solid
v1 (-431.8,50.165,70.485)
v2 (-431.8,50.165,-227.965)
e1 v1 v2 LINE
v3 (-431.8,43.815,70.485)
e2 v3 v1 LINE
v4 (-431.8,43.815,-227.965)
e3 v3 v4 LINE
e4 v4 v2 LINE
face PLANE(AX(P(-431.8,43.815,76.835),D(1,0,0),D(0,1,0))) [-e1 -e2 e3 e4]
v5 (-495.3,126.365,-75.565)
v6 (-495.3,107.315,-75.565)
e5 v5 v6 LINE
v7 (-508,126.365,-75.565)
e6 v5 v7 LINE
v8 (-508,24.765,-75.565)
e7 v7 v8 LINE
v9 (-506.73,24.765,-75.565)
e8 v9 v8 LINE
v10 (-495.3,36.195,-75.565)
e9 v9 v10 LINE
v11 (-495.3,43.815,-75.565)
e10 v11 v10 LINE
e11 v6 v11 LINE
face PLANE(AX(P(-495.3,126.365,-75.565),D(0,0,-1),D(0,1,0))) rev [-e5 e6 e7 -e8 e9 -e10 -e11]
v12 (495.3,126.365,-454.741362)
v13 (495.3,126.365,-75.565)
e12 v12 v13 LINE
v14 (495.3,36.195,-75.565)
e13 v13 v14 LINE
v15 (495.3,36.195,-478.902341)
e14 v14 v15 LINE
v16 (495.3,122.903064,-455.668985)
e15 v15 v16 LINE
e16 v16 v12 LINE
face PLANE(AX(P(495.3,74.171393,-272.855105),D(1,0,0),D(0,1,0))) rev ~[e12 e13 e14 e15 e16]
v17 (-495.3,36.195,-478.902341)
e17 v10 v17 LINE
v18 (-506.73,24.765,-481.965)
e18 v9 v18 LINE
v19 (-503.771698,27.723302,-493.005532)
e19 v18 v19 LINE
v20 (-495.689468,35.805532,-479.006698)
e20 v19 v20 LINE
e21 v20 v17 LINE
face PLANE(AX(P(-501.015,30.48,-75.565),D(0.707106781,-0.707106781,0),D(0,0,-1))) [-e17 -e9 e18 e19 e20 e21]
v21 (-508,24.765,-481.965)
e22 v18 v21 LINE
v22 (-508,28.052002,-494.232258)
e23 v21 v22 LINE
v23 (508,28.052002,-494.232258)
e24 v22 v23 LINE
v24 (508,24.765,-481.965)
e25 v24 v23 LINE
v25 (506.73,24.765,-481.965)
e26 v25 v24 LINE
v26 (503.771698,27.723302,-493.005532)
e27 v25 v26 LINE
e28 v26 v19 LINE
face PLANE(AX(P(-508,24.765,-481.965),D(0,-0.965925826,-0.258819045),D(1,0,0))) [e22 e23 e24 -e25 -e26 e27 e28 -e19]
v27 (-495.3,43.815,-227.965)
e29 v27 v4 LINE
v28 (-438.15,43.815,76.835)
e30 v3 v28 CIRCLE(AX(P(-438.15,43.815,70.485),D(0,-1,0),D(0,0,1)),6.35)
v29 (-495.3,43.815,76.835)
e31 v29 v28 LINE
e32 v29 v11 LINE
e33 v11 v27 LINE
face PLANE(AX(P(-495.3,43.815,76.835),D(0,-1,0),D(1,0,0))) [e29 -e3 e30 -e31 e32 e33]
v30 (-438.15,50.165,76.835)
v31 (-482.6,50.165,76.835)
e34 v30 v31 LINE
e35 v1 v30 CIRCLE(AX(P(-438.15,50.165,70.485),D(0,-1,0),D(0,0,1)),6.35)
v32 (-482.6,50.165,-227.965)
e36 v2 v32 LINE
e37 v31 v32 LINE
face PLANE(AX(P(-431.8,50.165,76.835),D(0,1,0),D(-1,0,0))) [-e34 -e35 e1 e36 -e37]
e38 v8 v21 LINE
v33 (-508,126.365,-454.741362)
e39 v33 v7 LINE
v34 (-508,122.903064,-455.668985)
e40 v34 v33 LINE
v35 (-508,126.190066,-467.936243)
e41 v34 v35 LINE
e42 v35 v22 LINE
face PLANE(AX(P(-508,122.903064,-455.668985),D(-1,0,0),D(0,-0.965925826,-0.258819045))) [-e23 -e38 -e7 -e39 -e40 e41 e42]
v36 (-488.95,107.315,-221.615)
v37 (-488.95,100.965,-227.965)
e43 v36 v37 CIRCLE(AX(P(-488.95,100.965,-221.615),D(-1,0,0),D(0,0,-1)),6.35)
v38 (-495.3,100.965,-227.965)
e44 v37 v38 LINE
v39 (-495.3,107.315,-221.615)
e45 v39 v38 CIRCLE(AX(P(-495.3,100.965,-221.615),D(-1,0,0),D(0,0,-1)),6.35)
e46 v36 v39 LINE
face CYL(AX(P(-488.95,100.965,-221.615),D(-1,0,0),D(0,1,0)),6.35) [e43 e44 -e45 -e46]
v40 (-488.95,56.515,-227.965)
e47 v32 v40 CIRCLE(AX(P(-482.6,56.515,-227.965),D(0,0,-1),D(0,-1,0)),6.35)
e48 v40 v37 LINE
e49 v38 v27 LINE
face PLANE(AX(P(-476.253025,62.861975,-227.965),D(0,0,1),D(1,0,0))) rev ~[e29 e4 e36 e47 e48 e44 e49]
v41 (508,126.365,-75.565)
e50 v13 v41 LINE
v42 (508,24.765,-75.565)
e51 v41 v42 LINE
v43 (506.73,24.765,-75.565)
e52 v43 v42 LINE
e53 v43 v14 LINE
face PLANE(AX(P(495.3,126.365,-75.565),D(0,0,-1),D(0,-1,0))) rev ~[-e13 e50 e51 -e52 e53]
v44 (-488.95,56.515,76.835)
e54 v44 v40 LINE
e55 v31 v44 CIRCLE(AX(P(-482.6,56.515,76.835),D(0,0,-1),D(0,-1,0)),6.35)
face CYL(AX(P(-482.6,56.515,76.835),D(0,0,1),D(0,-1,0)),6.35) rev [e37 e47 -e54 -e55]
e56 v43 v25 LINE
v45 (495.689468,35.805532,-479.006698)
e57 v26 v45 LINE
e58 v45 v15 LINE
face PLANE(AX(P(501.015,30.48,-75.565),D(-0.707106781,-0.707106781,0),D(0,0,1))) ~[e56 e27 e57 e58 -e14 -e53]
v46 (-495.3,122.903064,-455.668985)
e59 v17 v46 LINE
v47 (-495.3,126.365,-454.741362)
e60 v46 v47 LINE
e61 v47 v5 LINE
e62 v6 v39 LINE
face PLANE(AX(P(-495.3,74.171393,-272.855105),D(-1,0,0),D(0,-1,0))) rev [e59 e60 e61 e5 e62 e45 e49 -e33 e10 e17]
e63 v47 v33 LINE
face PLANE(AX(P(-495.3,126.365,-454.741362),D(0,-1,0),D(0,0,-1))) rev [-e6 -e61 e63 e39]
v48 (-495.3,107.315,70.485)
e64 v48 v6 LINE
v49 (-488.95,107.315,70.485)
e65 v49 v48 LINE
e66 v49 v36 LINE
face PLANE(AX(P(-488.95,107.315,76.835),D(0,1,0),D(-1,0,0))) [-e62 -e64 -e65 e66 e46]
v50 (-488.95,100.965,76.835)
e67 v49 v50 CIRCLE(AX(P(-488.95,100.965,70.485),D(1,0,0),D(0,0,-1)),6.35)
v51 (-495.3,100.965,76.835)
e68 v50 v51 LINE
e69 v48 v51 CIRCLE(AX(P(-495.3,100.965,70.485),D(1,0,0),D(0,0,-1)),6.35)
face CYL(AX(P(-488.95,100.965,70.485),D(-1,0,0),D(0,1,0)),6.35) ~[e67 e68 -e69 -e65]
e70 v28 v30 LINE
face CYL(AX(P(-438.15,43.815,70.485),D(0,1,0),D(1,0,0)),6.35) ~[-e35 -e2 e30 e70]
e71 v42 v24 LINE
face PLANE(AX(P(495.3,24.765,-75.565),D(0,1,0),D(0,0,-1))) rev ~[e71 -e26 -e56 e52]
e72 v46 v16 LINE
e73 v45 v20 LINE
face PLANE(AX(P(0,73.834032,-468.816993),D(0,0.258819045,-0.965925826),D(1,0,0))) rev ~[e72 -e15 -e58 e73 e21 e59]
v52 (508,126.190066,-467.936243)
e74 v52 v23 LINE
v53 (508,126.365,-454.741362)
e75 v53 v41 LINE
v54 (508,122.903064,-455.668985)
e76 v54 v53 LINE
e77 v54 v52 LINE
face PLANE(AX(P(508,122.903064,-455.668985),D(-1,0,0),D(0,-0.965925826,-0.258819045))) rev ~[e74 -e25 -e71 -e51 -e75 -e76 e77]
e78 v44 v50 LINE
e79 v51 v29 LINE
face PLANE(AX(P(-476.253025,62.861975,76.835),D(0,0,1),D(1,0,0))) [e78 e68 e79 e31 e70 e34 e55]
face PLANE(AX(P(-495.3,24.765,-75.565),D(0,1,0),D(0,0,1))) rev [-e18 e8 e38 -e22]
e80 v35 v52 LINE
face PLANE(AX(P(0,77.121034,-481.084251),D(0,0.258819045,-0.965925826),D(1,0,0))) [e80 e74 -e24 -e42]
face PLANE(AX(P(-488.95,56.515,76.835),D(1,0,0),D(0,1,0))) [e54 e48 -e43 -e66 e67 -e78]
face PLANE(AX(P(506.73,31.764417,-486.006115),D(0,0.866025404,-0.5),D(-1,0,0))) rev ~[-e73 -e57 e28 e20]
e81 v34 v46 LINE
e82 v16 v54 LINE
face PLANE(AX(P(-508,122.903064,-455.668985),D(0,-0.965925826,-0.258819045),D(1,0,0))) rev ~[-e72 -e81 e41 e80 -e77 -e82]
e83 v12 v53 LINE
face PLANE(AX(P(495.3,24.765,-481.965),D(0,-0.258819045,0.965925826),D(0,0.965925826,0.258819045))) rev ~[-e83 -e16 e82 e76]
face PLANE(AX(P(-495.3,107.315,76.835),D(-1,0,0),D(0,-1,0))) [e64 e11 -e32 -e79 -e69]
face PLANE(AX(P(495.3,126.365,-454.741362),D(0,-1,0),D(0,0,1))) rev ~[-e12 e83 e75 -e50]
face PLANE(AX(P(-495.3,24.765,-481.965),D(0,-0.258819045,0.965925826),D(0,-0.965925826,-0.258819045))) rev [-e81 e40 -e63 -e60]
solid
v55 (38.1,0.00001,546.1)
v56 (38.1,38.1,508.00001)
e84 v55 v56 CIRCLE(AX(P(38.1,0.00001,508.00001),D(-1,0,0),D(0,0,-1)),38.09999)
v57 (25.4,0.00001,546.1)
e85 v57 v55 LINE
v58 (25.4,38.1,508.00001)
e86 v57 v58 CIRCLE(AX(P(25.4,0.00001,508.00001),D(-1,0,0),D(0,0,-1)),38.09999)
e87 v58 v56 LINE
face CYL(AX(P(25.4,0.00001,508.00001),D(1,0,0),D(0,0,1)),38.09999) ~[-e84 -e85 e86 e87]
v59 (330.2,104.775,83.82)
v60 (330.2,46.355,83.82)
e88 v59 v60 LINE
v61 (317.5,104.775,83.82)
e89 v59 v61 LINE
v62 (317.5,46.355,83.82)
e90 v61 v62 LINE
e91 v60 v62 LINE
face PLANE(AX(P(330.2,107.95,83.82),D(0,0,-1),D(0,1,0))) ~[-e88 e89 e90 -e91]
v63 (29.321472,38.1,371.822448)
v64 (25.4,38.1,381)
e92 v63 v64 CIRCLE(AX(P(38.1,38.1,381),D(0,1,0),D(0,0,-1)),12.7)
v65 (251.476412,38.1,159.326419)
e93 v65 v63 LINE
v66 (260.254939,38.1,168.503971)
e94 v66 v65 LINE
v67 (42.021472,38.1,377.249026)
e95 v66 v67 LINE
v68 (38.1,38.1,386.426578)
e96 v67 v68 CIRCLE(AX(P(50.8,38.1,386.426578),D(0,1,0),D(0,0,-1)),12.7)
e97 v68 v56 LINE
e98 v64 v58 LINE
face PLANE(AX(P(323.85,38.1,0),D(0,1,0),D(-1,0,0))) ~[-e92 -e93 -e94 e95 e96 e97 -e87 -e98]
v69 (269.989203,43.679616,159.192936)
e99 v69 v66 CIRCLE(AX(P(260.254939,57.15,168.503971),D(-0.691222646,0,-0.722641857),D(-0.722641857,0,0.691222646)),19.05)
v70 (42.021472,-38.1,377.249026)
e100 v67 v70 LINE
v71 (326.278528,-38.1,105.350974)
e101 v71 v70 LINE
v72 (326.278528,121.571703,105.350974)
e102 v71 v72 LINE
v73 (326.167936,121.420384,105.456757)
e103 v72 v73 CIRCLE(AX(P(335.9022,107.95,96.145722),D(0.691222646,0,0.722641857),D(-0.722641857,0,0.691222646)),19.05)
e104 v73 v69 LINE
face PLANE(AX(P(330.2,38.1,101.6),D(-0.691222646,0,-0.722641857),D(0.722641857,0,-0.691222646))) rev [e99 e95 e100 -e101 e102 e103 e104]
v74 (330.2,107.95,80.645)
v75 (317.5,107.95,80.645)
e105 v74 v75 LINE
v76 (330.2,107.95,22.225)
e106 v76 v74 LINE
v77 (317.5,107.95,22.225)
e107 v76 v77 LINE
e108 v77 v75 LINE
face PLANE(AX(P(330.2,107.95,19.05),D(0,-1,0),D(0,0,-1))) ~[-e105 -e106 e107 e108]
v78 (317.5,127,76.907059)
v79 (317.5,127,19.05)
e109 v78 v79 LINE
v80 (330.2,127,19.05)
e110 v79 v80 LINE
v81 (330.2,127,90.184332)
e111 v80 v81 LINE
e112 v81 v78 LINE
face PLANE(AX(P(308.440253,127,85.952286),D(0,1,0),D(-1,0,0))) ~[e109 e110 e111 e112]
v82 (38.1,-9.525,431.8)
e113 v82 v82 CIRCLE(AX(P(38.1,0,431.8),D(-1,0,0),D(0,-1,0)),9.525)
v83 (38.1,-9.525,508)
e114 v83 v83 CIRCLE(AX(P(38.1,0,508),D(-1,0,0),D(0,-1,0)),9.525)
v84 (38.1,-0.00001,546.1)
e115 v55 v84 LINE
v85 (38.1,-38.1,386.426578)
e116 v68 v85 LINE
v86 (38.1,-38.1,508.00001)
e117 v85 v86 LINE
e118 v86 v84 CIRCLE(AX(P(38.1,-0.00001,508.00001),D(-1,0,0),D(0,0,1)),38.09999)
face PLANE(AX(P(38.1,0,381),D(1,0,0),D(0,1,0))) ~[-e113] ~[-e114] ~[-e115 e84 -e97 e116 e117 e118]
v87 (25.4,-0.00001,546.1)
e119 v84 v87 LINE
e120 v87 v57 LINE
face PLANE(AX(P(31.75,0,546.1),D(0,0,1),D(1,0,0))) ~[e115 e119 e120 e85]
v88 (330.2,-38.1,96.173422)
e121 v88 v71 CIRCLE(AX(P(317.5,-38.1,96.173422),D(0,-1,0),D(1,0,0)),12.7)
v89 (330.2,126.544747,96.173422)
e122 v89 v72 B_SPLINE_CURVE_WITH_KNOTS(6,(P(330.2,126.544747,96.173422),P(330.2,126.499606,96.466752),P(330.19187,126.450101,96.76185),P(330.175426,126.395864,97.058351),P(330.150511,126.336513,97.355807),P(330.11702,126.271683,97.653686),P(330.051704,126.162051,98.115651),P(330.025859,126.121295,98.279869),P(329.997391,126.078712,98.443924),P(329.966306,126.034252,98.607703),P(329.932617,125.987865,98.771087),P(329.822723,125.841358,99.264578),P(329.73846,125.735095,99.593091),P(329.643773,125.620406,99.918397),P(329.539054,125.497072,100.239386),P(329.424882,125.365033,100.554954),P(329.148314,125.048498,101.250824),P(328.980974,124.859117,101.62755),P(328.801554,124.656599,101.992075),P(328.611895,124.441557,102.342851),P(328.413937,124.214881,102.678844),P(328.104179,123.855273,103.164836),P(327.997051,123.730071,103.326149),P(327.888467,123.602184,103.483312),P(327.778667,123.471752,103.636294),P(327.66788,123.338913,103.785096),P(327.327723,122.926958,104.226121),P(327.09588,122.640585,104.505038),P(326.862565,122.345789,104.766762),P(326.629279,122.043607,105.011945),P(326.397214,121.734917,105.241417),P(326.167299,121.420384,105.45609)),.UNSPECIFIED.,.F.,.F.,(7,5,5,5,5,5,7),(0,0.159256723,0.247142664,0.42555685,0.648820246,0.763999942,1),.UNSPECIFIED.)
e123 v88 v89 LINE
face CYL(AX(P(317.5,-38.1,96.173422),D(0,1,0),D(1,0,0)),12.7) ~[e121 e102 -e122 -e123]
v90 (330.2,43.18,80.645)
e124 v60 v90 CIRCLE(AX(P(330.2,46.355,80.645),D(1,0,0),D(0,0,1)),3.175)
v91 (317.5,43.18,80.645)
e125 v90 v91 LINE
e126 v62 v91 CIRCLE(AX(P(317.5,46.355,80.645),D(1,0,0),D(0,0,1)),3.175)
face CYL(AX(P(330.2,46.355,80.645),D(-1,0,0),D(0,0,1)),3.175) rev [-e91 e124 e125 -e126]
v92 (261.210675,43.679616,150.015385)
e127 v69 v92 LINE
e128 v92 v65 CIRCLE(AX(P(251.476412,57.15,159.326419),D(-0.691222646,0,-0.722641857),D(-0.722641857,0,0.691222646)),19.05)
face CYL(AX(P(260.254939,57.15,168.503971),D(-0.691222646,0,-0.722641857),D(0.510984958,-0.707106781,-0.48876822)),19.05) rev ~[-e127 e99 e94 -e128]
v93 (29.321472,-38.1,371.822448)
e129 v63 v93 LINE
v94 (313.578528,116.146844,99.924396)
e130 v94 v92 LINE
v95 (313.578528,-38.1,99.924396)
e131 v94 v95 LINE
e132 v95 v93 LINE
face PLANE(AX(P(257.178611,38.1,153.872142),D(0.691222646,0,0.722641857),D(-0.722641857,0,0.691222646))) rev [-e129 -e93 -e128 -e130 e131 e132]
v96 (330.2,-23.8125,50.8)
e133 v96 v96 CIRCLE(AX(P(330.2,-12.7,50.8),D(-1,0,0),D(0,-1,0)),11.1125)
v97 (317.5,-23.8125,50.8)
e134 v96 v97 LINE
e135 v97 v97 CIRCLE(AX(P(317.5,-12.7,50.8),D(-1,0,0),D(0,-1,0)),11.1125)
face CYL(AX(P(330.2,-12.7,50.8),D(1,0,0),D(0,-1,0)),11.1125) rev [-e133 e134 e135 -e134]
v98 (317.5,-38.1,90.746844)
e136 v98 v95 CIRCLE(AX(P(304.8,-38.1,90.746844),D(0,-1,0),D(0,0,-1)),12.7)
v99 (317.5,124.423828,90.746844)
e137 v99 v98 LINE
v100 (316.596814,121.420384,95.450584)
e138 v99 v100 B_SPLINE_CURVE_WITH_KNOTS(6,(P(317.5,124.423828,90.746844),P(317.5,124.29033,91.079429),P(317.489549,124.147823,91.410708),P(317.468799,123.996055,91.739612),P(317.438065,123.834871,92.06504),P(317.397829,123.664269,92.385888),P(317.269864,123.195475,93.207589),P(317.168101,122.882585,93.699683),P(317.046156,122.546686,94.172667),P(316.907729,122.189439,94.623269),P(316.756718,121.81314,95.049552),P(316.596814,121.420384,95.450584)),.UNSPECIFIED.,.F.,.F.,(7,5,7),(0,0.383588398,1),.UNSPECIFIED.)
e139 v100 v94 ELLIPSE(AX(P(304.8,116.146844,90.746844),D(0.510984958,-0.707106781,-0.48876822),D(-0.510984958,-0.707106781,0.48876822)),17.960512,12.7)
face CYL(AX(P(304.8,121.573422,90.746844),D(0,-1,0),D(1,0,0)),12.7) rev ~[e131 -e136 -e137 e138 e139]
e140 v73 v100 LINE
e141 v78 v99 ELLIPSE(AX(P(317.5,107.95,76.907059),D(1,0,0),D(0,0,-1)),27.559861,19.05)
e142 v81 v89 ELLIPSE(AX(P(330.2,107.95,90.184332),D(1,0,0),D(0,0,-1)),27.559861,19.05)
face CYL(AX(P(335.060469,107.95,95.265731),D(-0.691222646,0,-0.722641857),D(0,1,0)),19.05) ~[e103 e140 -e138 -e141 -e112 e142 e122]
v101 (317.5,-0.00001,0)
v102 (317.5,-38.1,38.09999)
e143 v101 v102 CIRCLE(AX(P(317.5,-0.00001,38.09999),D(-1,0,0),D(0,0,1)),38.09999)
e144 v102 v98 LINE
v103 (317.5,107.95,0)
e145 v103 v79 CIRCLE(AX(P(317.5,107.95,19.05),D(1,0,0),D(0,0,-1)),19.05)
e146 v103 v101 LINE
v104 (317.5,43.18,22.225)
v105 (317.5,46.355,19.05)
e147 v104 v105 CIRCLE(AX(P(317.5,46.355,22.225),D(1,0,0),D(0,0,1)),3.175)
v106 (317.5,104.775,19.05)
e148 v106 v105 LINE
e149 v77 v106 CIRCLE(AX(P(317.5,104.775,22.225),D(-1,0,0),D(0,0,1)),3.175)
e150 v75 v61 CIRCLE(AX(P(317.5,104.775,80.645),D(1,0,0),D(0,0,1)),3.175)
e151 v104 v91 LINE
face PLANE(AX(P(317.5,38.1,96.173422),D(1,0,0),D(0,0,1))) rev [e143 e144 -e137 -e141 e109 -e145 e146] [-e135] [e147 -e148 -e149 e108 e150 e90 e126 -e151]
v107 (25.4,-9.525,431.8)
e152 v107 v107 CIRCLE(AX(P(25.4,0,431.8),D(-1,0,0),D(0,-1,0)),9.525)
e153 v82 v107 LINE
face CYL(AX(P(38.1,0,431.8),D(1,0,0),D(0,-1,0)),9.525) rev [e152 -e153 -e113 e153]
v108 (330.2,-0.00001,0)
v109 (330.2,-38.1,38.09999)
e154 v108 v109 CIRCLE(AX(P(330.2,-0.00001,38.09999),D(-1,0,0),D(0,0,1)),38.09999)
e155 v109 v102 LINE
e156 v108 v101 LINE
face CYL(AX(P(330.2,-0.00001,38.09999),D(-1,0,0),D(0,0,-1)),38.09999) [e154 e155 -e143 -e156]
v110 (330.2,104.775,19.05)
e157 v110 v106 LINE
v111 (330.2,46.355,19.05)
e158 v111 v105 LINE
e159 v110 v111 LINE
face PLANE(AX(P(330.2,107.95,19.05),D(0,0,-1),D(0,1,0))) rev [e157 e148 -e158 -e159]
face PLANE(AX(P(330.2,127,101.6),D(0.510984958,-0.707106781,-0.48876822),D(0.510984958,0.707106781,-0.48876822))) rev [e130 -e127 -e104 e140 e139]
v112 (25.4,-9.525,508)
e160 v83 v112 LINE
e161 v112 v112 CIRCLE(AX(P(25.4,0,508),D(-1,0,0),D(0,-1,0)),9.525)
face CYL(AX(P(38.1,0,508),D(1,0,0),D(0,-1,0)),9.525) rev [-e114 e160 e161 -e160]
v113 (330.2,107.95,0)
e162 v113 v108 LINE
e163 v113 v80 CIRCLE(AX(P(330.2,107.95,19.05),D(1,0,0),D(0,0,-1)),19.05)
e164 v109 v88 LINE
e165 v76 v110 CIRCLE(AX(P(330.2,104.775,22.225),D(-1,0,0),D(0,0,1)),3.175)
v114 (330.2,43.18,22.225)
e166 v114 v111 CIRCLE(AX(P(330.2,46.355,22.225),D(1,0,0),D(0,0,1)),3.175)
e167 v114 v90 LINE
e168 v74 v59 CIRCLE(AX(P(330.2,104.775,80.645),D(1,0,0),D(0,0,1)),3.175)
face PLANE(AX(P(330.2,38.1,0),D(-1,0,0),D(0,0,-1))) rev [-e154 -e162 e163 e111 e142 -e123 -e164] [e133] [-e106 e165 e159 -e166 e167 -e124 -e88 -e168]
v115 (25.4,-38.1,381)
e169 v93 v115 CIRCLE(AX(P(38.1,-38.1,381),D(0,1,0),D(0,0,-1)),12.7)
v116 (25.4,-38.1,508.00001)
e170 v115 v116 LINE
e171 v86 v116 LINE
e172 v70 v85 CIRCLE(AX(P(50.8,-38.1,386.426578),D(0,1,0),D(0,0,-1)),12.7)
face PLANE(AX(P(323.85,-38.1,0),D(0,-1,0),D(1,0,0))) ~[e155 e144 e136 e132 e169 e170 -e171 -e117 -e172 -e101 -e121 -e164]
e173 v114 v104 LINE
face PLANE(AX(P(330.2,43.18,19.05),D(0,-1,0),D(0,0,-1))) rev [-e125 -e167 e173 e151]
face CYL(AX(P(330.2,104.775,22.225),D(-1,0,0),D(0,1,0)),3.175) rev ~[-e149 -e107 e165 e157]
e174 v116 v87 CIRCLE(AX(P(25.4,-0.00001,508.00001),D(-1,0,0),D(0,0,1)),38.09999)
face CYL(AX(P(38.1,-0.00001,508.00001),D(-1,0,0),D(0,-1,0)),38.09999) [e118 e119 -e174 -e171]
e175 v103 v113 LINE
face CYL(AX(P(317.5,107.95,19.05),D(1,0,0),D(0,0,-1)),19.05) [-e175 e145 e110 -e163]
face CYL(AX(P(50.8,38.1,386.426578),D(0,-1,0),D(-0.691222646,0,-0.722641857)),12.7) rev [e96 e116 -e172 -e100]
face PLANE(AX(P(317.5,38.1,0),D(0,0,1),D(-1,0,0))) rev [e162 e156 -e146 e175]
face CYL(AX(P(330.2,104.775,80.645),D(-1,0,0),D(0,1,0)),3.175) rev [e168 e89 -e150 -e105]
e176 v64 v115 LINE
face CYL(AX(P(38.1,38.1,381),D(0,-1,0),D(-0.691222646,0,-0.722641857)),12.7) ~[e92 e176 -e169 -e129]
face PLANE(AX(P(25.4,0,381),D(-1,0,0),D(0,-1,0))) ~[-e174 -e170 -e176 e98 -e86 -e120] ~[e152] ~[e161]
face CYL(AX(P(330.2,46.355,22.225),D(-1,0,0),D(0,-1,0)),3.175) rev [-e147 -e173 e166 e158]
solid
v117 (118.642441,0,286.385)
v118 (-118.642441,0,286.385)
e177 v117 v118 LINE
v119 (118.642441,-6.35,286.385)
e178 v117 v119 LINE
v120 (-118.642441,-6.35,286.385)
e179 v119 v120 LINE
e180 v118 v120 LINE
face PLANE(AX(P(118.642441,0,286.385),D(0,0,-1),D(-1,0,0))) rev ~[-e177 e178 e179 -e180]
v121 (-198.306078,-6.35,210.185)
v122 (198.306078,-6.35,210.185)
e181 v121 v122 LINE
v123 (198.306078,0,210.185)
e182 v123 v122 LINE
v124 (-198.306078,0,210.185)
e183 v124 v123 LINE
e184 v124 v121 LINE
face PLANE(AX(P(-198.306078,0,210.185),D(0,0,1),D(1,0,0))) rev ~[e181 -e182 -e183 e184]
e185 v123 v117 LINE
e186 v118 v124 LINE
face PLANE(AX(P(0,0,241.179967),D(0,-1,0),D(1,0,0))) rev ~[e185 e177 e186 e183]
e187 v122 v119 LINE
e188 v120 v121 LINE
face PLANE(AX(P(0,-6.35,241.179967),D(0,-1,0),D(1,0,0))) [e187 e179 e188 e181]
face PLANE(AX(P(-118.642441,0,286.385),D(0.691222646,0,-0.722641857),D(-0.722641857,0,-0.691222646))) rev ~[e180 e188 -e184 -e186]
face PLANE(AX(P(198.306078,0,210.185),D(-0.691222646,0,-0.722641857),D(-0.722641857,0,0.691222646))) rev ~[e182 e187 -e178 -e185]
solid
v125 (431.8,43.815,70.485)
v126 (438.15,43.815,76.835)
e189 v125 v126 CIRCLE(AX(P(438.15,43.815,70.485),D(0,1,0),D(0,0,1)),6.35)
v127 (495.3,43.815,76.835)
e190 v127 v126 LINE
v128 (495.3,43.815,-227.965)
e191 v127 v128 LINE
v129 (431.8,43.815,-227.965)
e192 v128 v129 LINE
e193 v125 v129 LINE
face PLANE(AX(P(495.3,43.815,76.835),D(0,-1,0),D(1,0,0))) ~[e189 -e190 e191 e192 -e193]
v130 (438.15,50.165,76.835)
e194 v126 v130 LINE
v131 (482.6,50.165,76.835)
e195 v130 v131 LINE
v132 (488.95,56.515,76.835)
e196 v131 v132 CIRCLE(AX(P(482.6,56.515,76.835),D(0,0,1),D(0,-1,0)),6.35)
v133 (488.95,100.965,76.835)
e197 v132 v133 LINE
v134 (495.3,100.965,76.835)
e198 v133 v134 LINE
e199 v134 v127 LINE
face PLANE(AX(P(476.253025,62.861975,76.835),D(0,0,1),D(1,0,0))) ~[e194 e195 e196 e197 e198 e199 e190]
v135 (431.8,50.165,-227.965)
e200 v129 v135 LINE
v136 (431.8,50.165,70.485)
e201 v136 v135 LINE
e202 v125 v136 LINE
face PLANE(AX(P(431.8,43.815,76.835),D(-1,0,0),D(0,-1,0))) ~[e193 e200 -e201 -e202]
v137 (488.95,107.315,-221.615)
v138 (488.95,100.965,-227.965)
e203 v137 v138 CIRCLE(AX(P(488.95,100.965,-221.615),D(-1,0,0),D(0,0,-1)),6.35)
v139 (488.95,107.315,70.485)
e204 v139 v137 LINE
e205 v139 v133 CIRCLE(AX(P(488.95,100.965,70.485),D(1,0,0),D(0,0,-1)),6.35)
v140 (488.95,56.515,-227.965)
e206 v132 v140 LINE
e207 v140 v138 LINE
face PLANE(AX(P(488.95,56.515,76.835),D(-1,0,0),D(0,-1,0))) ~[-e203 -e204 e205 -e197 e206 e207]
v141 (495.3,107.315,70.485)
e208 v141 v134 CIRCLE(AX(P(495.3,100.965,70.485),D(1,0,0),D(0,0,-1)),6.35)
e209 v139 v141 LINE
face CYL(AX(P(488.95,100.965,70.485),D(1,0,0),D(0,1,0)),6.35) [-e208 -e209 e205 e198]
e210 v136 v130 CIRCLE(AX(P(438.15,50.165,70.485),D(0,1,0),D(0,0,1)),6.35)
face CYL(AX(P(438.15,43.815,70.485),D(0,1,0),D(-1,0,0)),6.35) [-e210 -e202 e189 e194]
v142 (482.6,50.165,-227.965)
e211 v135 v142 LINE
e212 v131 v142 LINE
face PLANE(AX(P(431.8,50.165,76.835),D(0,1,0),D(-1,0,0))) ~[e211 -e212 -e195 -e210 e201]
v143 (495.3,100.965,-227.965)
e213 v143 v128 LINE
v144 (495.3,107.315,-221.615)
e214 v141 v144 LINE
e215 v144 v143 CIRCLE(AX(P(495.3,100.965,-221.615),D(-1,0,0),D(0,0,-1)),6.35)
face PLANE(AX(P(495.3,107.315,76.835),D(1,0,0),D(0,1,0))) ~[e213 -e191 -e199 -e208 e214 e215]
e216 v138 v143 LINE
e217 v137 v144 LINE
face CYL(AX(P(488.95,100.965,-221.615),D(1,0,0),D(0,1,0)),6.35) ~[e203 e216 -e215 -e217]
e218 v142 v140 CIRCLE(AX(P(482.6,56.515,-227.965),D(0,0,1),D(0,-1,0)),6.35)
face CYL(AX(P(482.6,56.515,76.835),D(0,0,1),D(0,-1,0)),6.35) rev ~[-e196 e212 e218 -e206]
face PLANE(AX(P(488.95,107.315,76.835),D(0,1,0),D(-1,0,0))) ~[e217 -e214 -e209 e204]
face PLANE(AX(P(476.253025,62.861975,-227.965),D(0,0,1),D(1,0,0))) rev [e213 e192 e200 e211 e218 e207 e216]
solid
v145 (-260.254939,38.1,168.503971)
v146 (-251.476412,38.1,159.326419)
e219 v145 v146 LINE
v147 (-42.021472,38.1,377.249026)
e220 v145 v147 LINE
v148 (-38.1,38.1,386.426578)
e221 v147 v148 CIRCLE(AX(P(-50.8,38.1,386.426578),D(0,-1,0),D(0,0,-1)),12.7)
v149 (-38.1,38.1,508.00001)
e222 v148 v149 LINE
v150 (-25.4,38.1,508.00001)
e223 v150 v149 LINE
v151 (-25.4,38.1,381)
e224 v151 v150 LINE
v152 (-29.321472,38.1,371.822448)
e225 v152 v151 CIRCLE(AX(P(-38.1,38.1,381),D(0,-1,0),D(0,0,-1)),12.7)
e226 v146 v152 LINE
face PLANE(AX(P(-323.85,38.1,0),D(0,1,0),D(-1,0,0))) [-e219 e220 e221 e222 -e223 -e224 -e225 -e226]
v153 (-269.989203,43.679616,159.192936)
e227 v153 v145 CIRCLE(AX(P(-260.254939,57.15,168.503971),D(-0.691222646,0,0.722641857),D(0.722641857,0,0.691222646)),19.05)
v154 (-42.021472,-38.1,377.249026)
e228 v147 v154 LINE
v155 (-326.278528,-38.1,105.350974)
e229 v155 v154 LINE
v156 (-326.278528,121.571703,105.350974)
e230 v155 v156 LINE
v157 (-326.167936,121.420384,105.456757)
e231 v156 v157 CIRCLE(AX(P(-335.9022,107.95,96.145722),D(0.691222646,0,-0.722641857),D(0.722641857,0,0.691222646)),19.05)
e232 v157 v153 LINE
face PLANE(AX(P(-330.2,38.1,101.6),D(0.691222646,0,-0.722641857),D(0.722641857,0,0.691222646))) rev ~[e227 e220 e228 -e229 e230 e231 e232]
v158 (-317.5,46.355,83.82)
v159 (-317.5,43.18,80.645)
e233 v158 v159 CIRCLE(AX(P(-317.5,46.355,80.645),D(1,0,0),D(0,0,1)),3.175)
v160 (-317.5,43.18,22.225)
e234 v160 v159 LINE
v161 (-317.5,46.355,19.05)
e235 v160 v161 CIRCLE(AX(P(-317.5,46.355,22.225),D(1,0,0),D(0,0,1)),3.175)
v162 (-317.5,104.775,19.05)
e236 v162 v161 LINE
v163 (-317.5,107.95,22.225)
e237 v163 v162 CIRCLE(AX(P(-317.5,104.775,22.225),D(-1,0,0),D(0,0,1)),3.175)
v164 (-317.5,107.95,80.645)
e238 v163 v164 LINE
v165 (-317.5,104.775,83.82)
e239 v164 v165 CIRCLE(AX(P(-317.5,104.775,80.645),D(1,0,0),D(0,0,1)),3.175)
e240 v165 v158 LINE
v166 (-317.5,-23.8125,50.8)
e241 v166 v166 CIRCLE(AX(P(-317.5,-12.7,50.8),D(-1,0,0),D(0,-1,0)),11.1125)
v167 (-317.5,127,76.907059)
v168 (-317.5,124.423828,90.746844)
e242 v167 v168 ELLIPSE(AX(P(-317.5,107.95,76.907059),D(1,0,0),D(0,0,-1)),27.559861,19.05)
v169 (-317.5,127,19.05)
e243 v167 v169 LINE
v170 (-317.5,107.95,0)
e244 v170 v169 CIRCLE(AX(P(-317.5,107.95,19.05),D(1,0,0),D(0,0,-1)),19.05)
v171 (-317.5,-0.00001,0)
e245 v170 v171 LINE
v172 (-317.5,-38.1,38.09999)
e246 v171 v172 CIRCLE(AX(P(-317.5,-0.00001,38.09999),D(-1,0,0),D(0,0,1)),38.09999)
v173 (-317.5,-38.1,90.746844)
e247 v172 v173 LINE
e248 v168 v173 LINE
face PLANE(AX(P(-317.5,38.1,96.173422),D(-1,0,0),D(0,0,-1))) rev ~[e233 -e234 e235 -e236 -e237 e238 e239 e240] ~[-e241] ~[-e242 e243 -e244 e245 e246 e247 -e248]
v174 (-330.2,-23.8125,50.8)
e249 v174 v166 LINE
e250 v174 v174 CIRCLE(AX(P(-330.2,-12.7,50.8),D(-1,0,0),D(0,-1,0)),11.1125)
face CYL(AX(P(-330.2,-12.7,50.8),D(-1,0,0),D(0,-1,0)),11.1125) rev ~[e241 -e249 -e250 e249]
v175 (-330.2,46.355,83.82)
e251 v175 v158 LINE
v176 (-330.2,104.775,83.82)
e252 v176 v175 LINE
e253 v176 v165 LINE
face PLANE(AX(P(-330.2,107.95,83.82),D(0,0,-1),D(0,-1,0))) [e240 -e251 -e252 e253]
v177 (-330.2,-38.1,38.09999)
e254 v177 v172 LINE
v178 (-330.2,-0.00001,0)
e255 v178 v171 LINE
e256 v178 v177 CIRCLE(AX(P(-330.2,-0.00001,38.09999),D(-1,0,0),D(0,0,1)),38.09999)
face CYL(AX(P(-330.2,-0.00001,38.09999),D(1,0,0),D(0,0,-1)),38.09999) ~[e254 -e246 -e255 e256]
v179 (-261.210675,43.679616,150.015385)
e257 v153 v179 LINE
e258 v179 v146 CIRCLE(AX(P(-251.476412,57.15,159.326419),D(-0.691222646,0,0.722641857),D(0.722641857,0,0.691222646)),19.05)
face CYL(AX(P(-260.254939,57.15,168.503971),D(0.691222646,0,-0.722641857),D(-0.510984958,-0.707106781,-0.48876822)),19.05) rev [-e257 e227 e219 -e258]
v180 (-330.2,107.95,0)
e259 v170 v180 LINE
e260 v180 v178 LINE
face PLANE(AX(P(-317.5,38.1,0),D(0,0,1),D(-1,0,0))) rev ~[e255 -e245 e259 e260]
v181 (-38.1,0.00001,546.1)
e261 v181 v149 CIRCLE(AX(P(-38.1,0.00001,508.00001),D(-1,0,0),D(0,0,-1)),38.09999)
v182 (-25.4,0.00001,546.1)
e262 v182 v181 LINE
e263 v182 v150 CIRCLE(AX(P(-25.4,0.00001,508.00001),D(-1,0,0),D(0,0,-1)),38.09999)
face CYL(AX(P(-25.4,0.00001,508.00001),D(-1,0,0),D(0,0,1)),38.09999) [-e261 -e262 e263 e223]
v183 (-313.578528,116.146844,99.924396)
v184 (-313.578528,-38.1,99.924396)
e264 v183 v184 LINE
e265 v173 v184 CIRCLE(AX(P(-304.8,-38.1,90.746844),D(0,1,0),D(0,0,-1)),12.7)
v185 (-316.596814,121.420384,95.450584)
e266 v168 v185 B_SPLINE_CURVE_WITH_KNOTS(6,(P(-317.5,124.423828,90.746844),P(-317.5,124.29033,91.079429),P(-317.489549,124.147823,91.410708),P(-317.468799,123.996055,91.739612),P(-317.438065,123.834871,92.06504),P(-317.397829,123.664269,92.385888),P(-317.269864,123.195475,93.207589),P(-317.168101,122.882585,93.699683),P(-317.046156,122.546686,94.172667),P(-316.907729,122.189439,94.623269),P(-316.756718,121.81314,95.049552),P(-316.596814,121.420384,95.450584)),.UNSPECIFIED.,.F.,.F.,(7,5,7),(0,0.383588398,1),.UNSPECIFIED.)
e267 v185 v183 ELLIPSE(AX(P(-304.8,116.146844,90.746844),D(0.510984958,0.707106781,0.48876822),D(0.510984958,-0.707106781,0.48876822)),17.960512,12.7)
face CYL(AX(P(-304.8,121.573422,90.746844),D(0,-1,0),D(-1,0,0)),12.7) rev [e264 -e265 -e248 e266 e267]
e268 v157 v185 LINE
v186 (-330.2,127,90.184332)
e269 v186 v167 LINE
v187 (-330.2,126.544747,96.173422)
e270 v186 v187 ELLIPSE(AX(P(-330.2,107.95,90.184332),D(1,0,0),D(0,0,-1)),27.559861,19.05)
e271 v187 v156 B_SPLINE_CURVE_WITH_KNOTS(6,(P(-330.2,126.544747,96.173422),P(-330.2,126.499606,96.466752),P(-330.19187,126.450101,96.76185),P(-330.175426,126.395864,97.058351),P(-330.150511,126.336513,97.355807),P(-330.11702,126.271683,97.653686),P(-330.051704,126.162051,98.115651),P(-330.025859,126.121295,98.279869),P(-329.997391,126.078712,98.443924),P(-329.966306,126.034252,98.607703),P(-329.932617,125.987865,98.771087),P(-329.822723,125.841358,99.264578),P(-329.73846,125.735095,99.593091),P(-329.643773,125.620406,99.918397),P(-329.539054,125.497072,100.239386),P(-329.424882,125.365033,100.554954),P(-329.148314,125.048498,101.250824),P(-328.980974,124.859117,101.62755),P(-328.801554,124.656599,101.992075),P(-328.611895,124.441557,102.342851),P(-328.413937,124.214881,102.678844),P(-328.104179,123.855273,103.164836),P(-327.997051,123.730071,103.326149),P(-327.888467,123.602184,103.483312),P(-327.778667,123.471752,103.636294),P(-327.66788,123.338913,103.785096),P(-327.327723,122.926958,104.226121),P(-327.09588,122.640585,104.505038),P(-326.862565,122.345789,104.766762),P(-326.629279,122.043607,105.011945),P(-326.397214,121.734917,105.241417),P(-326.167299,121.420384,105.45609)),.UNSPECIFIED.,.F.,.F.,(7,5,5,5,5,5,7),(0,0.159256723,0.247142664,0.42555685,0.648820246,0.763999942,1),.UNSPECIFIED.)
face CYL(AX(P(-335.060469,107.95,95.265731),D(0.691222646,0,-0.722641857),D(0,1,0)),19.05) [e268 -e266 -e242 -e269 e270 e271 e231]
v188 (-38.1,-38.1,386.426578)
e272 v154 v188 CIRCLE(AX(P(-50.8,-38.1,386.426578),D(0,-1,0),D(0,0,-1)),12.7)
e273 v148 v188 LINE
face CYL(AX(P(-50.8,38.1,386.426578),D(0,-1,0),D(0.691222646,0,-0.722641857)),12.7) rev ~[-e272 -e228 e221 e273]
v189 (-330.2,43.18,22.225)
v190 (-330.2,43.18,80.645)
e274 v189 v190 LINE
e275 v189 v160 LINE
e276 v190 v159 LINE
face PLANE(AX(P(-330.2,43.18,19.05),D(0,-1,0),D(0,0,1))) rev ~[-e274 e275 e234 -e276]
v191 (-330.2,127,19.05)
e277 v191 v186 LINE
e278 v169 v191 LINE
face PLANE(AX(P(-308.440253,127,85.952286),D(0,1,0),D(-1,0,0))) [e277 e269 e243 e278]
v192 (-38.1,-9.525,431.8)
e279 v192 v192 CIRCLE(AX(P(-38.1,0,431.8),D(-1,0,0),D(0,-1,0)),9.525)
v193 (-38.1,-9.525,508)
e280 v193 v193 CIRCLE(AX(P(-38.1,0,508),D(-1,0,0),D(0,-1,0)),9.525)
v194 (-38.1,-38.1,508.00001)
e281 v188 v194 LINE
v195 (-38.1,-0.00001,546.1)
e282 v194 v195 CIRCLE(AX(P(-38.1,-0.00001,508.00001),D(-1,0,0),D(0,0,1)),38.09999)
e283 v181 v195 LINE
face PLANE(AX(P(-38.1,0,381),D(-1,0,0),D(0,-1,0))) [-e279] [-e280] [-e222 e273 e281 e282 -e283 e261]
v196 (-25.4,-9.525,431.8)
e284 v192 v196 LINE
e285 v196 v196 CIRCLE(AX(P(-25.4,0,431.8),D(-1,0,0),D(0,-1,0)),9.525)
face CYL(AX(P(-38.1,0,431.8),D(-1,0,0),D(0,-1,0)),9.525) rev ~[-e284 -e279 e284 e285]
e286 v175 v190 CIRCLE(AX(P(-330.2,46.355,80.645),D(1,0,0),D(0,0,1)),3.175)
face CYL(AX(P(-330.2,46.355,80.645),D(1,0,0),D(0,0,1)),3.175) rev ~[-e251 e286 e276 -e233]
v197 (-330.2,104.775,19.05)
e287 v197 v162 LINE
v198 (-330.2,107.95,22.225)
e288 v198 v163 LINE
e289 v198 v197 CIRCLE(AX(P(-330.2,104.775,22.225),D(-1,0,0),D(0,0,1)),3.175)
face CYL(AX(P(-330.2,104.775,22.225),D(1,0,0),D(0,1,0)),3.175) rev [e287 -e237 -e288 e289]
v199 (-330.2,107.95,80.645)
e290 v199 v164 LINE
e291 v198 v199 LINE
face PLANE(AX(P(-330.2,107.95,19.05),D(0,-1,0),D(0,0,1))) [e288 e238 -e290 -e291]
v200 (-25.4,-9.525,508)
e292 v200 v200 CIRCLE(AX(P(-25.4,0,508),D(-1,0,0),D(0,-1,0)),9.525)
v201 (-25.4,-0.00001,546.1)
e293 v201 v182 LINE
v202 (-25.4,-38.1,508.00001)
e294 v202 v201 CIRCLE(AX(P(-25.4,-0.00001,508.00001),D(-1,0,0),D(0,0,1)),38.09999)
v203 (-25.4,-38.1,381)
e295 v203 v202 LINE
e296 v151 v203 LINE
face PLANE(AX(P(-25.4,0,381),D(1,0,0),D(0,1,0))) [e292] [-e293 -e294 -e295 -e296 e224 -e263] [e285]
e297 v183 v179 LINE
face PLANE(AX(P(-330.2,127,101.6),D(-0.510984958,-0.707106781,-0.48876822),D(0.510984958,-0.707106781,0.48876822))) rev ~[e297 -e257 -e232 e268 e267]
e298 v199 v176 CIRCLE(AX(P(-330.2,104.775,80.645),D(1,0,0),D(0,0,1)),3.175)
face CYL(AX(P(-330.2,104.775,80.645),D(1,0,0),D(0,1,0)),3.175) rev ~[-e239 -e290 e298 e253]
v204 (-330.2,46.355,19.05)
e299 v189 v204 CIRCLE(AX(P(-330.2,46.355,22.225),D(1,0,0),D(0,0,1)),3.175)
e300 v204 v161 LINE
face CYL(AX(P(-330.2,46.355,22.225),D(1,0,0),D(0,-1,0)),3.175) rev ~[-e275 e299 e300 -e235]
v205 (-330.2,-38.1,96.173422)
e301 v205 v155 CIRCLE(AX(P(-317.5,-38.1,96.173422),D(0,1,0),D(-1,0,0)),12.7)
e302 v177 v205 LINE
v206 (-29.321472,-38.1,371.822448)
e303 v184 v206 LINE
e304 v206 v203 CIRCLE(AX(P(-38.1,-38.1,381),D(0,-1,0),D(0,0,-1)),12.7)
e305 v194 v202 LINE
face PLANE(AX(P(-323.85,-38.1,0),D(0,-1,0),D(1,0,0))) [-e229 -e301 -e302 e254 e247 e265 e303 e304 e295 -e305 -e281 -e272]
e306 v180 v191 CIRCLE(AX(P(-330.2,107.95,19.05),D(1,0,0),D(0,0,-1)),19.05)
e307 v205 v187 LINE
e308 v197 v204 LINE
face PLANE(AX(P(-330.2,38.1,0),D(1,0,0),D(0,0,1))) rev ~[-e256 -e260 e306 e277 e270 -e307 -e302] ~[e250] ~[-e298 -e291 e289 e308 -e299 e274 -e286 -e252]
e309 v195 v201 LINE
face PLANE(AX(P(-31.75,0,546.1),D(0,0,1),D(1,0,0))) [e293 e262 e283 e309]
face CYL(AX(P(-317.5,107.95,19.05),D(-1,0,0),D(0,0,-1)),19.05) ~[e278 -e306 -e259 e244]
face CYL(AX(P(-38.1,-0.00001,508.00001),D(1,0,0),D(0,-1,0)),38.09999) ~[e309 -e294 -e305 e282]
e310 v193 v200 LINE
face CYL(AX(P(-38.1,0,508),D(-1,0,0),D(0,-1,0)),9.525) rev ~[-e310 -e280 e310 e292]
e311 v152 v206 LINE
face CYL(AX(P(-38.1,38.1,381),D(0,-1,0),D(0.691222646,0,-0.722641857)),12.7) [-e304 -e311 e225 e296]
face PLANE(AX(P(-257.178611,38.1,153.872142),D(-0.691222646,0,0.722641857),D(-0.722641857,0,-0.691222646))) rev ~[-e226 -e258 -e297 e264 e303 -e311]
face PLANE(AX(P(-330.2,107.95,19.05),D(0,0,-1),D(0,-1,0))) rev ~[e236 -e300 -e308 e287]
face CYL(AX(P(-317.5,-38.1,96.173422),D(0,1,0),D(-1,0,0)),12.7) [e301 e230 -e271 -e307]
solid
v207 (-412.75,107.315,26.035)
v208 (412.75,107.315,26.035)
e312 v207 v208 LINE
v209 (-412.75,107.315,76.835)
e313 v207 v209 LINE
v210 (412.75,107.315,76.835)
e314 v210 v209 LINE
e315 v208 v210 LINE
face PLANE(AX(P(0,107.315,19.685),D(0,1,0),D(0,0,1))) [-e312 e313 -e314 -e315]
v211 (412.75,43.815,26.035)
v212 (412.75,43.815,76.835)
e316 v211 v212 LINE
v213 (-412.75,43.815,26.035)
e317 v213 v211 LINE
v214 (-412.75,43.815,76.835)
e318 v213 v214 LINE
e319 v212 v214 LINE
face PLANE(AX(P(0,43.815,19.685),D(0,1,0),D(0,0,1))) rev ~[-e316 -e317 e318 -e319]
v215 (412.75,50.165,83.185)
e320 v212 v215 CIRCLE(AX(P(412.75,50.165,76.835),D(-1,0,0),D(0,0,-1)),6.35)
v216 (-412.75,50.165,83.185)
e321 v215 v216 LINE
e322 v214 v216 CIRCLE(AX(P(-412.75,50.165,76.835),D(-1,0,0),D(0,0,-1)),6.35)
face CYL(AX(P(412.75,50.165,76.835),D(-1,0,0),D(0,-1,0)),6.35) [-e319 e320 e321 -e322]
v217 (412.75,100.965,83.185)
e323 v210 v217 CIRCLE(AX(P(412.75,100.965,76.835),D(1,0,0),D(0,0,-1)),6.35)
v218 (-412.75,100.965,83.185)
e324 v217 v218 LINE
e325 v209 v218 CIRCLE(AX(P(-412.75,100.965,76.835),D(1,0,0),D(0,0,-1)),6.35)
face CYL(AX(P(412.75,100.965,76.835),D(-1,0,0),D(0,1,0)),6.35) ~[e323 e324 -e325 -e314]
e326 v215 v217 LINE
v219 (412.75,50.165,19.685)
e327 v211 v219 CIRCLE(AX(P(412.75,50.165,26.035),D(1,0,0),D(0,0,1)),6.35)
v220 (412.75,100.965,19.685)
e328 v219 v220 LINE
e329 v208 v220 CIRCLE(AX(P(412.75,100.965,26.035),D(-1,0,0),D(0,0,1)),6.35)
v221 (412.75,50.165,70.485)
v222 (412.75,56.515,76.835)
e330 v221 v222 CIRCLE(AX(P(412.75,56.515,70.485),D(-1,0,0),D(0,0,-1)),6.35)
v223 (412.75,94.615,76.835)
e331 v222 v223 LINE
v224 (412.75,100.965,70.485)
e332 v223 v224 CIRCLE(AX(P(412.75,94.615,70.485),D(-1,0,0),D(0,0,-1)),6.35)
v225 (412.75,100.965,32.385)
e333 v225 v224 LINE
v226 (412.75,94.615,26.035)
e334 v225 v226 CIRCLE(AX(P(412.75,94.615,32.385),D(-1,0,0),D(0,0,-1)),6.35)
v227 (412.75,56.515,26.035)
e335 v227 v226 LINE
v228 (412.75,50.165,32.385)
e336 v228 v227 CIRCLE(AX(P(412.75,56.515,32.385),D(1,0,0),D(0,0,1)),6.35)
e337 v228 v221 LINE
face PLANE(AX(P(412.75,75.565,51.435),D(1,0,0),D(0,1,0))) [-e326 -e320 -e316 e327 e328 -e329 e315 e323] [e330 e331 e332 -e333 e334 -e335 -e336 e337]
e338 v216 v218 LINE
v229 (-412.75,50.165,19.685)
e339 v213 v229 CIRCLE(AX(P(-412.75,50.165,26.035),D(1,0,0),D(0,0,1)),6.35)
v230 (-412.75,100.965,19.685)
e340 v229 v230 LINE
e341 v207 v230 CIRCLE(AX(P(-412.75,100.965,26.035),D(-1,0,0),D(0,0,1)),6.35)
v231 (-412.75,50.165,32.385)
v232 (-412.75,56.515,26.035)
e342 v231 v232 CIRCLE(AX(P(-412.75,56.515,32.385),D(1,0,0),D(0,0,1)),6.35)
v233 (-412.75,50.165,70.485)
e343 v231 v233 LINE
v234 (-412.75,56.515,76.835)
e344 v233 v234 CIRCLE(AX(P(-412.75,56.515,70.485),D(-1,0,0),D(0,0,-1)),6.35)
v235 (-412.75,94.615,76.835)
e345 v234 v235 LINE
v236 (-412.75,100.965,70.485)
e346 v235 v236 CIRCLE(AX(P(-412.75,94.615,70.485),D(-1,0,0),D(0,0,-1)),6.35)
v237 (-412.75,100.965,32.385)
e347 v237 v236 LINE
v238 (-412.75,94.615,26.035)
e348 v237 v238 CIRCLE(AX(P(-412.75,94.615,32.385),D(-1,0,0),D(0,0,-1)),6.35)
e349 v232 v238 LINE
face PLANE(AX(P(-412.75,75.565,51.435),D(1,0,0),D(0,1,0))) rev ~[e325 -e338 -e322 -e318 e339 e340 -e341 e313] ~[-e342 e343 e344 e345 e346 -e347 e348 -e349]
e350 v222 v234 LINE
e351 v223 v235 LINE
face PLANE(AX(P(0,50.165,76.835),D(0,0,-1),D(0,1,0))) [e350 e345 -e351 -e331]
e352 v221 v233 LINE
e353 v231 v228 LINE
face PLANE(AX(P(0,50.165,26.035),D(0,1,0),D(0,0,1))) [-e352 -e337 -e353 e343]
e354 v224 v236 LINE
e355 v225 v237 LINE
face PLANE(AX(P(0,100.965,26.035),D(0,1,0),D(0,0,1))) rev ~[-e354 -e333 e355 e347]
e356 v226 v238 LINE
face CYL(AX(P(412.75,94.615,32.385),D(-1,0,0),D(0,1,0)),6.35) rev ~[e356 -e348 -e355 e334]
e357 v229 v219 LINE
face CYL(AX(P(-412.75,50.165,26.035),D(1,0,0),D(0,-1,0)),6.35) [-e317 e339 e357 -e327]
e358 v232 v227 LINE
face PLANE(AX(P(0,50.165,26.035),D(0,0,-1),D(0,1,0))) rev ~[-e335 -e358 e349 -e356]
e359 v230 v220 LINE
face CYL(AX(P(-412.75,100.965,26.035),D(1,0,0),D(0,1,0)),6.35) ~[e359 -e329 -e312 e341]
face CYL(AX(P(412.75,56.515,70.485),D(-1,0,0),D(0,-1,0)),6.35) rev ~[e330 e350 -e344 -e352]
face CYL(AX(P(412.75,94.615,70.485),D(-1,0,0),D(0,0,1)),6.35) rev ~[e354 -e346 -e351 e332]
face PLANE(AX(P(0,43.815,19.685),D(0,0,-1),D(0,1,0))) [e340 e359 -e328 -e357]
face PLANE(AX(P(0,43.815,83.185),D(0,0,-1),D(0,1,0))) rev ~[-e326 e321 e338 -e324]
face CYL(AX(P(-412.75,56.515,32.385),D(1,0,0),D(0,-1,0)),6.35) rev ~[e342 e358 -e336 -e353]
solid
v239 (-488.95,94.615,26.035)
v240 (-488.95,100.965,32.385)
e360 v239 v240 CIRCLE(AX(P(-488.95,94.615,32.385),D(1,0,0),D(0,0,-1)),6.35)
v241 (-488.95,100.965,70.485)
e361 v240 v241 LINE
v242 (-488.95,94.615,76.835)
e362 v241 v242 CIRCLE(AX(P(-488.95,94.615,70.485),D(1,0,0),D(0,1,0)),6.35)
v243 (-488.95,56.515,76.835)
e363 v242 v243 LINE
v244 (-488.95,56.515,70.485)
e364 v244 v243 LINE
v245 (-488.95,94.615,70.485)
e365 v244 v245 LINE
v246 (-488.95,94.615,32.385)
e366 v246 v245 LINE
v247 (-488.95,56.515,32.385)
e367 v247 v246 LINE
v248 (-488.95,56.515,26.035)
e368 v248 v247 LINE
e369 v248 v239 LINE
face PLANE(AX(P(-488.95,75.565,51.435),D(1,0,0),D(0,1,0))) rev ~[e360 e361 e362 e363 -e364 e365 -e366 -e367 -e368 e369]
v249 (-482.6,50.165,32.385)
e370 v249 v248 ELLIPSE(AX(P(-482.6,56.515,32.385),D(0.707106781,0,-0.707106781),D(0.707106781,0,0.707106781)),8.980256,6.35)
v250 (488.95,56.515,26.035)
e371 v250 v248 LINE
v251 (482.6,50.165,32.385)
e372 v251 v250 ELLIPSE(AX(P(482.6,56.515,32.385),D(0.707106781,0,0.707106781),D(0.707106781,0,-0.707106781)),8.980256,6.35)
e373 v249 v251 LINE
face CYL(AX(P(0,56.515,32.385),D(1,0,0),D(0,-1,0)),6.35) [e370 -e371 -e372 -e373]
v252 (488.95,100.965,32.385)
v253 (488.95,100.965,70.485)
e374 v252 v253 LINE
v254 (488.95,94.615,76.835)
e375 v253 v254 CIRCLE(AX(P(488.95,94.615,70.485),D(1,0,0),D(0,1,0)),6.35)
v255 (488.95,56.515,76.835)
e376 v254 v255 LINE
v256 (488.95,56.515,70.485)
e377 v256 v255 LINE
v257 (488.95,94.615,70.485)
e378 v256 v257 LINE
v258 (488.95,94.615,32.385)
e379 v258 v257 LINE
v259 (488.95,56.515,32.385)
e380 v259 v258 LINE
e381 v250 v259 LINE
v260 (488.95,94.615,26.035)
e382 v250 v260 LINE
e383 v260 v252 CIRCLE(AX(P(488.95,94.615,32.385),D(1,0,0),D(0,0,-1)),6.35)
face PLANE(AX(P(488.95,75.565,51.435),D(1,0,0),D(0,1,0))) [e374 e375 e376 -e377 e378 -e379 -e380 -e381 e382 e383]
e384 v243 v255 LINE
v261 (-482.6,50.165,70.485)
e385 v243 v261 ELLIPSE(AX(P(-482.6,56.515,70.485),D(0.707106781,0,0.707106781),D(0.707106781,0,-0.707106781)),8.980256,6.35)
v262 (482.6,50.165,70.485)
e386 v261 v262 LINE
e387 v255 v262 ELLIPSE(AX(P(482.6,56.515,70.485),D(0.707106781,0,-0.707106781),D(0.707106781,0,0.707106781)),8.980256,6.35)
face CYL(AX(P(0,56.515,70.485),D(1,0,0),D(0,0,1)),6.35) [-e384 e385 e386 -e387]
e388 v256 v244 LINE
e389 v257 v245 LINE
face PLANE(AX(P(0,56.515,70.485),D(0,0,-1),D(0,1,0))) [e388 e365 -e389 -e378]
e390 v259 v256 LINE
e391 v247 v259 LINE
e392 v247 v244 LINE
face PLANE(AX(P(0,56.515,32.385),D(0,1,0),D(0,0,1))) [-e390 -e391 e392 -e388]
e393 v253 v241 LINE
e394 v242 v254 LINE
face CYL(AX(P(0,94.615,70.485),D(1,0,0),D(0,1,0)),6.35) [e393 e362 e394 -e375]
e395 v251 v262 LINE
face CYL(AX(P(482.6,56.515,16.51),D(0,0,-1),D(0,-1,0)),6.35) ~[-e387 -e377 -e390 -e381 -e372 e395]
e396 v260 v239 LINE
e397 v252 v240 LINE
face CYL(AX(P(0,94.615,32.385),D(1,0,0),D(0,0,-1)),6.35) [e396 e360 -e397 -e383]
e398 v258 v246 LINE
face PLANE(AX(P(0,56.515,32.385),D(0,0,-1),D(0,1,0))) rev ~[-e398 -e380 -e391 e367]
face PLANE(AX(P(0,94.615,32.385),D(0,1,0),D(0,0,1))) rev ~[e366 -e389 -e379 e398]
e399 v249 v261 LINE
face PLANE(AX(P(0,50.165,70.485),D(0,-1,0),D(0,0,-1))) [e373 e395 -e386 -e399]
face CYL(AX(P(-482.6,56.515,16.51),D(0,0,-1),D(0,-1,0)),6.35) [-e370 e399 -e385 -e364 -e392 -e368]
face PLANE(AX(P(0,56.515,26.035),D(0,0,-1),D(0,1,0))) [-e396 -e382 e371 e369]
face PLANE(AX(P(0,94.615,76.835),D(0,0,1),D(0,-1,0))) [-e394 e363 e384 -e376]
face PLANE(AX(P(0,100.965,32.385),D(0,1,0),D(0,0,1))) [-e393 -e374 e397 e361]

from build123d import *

# Parameters (mm, degrees)
F1_W         = 12.7
F1_H         = 76.2
F4_DEPTH     = 88.9
F6_DEPTH     = 284.1060751771
F7_R         = 12.7
F8_R         = 38.09999
F9_R         = 9.525
F10_DEPTH    = 12.7
F11_R        = 11.1125
F12_DEPTH    = 12.7
F13_R        = 19.05
F14_W        = 64.77
F14_H        = 64.77
F15_DEPTH    = 12.7
F16_R        = 3.175
F18_W        = 63.5
F18_H        = 63.5
F18_W_2      = 50.8
F18_H_2      = 50.8
F19_DEPTH    = 412.75
F20_R        = 6.35
F22_DEPTH    = 6.35
F23_W        = 38.1
F23_H        = 38.1
F24_DEPTH    = 488.95
F25_T1_DEPTH = 69.85
F27_DEPTH    = 304.8
F28_R        = 6.35
F31_DEPTH    = 12.7
F33_W        = 1016
F33_H        = 101.6
F34_DEPTH    = 12.7
F35_SIZE     = 11.43
F36_SIZE     = 11.43


# Not quite as in the source:
# - a fillet or chamfer that OpenCascade refuses, or shapes differently, is made with other operations: its cross-section is extruded or revolved along the edge and cut away or added
# - a fillet or chamfer is up to 0.001 mm smaller than in the source, because OpenCascade refuses the exact size


with BuildPart() as f2:
    # F2: sweep along a path in F0
    with BuildLine(Plane.XZ) as f2_path:
        Line((-330.2, 0), (-330.2, 101.6))
        Line((-330.2, 101.6), (-38.1, 381))
        Line((-38.1, 381), (-38.1, 546.1))
    # F1 (on Top) → F2 (sweep)
    with BuildSketch(Plane.XY):
        with Locations((-323.85, 0)):
            Rectangle(F1_W, F1_H)
    sweep(path=f2_path.line, transition=Transition.RIGHT)

    # F3 (on face) → F4 (join)
    with BuildSketch(Plane(origin=(0, 38.1, 0), x_dir=(-1, 0, 0), z_dir=(0, 1, 0))):
        Polygon((330.2, 0), (330.2, 101.6), (265.9571388996, 163.0496932265), (257.1786112958, 153.8721416407), (317.5, 96.1734220106), (317.5, 0), align=None)
    extrude(amount=F4_DEPTH)

    # F5 (on face) → F6 (cut, through all)
    with BuildSketch(Plane(origin=(-208.5156959526, 0, 217.9936821323), x_dir=(0.7226418571, 0, 0.691222646), z_dir=(-0.691222646, 0, 0.7226418571))):
        Polygon((-79.4881203999, 38.1), (-79.4881203999, 127), (-168.3881203999, 127), align=None)
    extrude(amount=-F6_DEPTH, mode=Mode.SUBTRACT)

    # F7
    f7_edges = [f2.edges().sort_by_distance(p)[0] for p in [
        (-330.2, 44.45, 101.6),
        (-317.5, 41.736711, 96.173422),
        (-38.1, 0, 381),
        (-25.4, 0, 375.573422),
    ]]
    fillet(f7_edges, radius=F7_R)

    # F8 (radius 38.1 in the source; OpenCascade refuses exactly that, so slightly less here)
    f8_edges = [f2.edges().sort_by_distance(p)[0] for p in [
        (-31.75, -38.1, 546.1),
        (-31.75, 38.1, 546.1),
        (-323.85, -38.1, 0),
    ]]
    fillet(f8_edges, radius=F8_R)

    # F9 (on face) → F10 (cut, through all)
    with BuildSketch(Plane(origin=(-38.1, 0, 0), x_dir=(0, -1, 0), z_dir=(-1, 0, 0))):
        with Locations((0, 508)):
            Circle(F9_R)
        with Locations((0, 431.8)):
            Circle(F9_R)
    extrude(amount=-F10_DEPTH, mode=Mode.SUBTRACT)

    # F11 (on face) → F12 (cut, through all)
    with BuildSketch(Plane(origin=(-330.2, 0, 0), x_dir=(0, -1, 0), z_dir=(-1, 0, 0))):
        with Locations((12.7, 50.8)):
            Circle(F11_R)
    extrude(amount=-F12_DEPTH, mode=Mode.SUBTRACT)

    # F13
    f13_edges = [f2.edges().sort_by_distance(p)[0] for p in [
        (-323.85, 127, 0),
        (-323.429135, 127, 94.521368),
        (-261.567875, 38.1, 158.460917),
    ]]
    fillet(f13_edges, radius=F13_R)

    # F14 (on face) → F15 (cut, through all)
    with BuildSketch(Plane(origin=(-330.2, 0, 0), x_dir=(0, -1, 0), z_dir=(-1, 0, 0))):
        with Locations((-75.565, 51.435)):
            Rectangle(F14_W, F14_H)
    extrude(amount=-F15_DEPTH, mode=Mode.SUBTRACT)

    # F16
    f16_edges = [f2.edges().sort_by_distance(p)[0] for p in [
        (-323.85, 107.95, 83.82),
        (-323.85, 43.18, 83.82),
        (-323.85, 43.18, 19.05),
        (-323.85, 107.95, 19.05),
    ]]
    fillet(f16_edges, radius=F16_R)


with BuildPart() as f17_1:
    # F17: instance of F2
    add(f2.part.mirror(Plane.YZ))


with BuildPart() as f19:
    # F18 (on Right) → F19 (new body, symmetric)
    with BuildSketch(Plane.YZ):
        with Locations((75.565, 51.435)):
            Rectangle(F18_W, F18_H)
        with Locations((75.565, 51.435)):
            Rectangle(F18_W_2, F18_H_2, mode=Mode.SUBTRACT)
    extrude(amount=F19_DEPTH, both=True)

    # F20
    f20_edges = [f19.edges().sort_by_distance(p)[0] for p in [
        (0, 100.965, 76.835),
        (0, 50.165, 76.835),
        (0, 50.165, 26.035),
        (0, 100.965, 26.035),
        (0, 43.815, 83.185),
        (0, 43.815, 19.685),
        (0, 107.315, 19.685),
        (0, 107.315, 83.185),
    ]]
    fillet(f20_edges, radius=F20_R)


with BuildPart() as f22:
    # F21 (on Front) → F22 (new body)
    with BuildSketch(Plane.XZ):
        Polygon((-118.6424411929, 286.385), (-198.3060775565, 210.185), (198.3060775565, 210.185), (118.6424411929, 286.385), align=None)
    extrude(amount=F22_DEPTH)


with BuildPart() as f24:
    # F23 (on Right) → F24 (new body, symmetric)
    with BuildSketch(Plane.YZ):
        with BuildLine():
            ThreePointArc((100.965, 70.485), (99.1051280605, 74.9751280605), (94.615, 76.835))
            Line((94.615, 76.835), (56.515, 76.835))
            ThreePointArc((56.515, 76.835), (52.0248719395, 74.9751280605), (50.165, 70.485))
            Line((50.165, 70.485), (50.165, 32.385))
            ThreePointArc((50.165, 32.385), (52.0248719395, 27.8948719395), (56.515, 26.035))
            Line((56.515, 26.035), (94.615, 26.035))
            ThreePointArc((94.615, 26.035), (99.1051280605, 27.8948719395), (100.965, 32.385))
            Line((100.965, 32.385), (100.965, 70.485))
        make_face()
        with Locations((75.565, 51.435)):
            Rectangle(F23_W, F23_H, mode=Mode.SUBTRACT)
    extrude(amount=F24_DEPTH, both=True)

    # F25: fillet of radius 6.35 on 2 edges, made by hand

    # F25_s2 → F25_t1 (cut)
    with BuildSketch(Plane.XY.offset(16.51)):
        with BuildLine():
            ThreePointArc((-482.6, 50.165), (-487.0901280605, 52.0248719395), (-488.95, 56.515))
            Line((-488.95, 56.515), (-488.95, 50.165))
            Line((-488.95, 50.165), (-482.6, 50.165))
        make_face()
        with BuildLine():
            ThreePointArc((482.6, 50.165), (487.0901280605, 52.0248719395), (488.95, 56.515))
            Line((488.95, 56.515), (488.95, 50.165))
            Line((488.95, 50.165), (482.6, 50.165))
        make_face()
    extrude(amount=F25_T1_DEPTH, mode=Mode.SUBTRACT)


with BuildPart() as f27:
    # F26 (on face) → F27 (new body)
    with BuildSketch(Plane.XY.offset(76.835)):
        with BuildLine():
            Line((-431.8, 43.815), (-431.8, 50.165))
            Line((-431.8, 50.165), (-482.6, 50.165))
            ThreePointArc((-482.6, 50.165), (-487.0901280605, 52.0248719395), (-488.95, 56.515))
            Line((-488.95, 56.515), (-488.95, 107.315))
            Line((-488.95, 107.315), (-495.3, 107.315))
            Line((-495.3, 107.315), (-495.3, 43.815))
            Line((-495.3, 43.815), (-431.8, 43.815))
        make_face()
    extrude(amount=-F27_DEPTH)

    # F28
    f28_edges = [f27.edges().sort_by_distance(p)[0] for p in [
        (-431.8, 46.99, 76.835),
        (-492.125, 107.315, 76.835),
        (-492.125, 107.315, -227.965),
    ]]
    fillet(f28_edges, radius=F28_R)


with BuildPart() as f29_1:
    # F29: instance of F27
    add(f27.part.mirror(Plane.YZ))


with BuildPart() as f31:
    # F30 (on face) → F31 (new body)
    with BuildSketch(Plane.YZ.offset(495.3)):
        Polygon((126.365, -454.741362049), (126.365, -75.565), (24.765, -75.565), (24.765, -481.965), align=None)
    extrude(amount=F31_DEPTH)


with BuildPart() as f27_1:
    add(f27.part)

    # F32: F31 across plane
    add(f31.part.mirror(Plane.YZ))

    add(f31.part)  # F34 merges F31
    # F33 (on face) → F34 (join)
    with BuildSketch(Plane(origin=(0, 122.1501904376, -455.8707168675), x_dir=(1, 0, 0), z_dir=(0, 0.2588190451, -0.9659258263))):
        with Locations((0, 50.0205679848)):
            Rectangle(F33_W, F33_H)
    extrude(amount=F34_DEPTH)

    # F35
    f35_edges = [f27_1.edges().sort_by_distance(p)[0] for p in [
        (-495.3, 24.765, -278.765),
        (495.3, 24.765, -278.765),
    ]]
    chamfer(f35_edges, length=F35_SIZE)

    # F36
    f36_edges = [f27_1.edges().sort_by_distance(p)[0] for p in [
        (501.015, 24.765, -481.965),
        (0, 24.765, -481.965),
        (-501.015, 24.765, -481.965),
    ]]
    chamfer(f36_edges, length=F36_SIZE)


solid = Compound([f2.part, f17_1.part, f19.part, f22.part, f24.part, f29_1.part, f27_1.part])
